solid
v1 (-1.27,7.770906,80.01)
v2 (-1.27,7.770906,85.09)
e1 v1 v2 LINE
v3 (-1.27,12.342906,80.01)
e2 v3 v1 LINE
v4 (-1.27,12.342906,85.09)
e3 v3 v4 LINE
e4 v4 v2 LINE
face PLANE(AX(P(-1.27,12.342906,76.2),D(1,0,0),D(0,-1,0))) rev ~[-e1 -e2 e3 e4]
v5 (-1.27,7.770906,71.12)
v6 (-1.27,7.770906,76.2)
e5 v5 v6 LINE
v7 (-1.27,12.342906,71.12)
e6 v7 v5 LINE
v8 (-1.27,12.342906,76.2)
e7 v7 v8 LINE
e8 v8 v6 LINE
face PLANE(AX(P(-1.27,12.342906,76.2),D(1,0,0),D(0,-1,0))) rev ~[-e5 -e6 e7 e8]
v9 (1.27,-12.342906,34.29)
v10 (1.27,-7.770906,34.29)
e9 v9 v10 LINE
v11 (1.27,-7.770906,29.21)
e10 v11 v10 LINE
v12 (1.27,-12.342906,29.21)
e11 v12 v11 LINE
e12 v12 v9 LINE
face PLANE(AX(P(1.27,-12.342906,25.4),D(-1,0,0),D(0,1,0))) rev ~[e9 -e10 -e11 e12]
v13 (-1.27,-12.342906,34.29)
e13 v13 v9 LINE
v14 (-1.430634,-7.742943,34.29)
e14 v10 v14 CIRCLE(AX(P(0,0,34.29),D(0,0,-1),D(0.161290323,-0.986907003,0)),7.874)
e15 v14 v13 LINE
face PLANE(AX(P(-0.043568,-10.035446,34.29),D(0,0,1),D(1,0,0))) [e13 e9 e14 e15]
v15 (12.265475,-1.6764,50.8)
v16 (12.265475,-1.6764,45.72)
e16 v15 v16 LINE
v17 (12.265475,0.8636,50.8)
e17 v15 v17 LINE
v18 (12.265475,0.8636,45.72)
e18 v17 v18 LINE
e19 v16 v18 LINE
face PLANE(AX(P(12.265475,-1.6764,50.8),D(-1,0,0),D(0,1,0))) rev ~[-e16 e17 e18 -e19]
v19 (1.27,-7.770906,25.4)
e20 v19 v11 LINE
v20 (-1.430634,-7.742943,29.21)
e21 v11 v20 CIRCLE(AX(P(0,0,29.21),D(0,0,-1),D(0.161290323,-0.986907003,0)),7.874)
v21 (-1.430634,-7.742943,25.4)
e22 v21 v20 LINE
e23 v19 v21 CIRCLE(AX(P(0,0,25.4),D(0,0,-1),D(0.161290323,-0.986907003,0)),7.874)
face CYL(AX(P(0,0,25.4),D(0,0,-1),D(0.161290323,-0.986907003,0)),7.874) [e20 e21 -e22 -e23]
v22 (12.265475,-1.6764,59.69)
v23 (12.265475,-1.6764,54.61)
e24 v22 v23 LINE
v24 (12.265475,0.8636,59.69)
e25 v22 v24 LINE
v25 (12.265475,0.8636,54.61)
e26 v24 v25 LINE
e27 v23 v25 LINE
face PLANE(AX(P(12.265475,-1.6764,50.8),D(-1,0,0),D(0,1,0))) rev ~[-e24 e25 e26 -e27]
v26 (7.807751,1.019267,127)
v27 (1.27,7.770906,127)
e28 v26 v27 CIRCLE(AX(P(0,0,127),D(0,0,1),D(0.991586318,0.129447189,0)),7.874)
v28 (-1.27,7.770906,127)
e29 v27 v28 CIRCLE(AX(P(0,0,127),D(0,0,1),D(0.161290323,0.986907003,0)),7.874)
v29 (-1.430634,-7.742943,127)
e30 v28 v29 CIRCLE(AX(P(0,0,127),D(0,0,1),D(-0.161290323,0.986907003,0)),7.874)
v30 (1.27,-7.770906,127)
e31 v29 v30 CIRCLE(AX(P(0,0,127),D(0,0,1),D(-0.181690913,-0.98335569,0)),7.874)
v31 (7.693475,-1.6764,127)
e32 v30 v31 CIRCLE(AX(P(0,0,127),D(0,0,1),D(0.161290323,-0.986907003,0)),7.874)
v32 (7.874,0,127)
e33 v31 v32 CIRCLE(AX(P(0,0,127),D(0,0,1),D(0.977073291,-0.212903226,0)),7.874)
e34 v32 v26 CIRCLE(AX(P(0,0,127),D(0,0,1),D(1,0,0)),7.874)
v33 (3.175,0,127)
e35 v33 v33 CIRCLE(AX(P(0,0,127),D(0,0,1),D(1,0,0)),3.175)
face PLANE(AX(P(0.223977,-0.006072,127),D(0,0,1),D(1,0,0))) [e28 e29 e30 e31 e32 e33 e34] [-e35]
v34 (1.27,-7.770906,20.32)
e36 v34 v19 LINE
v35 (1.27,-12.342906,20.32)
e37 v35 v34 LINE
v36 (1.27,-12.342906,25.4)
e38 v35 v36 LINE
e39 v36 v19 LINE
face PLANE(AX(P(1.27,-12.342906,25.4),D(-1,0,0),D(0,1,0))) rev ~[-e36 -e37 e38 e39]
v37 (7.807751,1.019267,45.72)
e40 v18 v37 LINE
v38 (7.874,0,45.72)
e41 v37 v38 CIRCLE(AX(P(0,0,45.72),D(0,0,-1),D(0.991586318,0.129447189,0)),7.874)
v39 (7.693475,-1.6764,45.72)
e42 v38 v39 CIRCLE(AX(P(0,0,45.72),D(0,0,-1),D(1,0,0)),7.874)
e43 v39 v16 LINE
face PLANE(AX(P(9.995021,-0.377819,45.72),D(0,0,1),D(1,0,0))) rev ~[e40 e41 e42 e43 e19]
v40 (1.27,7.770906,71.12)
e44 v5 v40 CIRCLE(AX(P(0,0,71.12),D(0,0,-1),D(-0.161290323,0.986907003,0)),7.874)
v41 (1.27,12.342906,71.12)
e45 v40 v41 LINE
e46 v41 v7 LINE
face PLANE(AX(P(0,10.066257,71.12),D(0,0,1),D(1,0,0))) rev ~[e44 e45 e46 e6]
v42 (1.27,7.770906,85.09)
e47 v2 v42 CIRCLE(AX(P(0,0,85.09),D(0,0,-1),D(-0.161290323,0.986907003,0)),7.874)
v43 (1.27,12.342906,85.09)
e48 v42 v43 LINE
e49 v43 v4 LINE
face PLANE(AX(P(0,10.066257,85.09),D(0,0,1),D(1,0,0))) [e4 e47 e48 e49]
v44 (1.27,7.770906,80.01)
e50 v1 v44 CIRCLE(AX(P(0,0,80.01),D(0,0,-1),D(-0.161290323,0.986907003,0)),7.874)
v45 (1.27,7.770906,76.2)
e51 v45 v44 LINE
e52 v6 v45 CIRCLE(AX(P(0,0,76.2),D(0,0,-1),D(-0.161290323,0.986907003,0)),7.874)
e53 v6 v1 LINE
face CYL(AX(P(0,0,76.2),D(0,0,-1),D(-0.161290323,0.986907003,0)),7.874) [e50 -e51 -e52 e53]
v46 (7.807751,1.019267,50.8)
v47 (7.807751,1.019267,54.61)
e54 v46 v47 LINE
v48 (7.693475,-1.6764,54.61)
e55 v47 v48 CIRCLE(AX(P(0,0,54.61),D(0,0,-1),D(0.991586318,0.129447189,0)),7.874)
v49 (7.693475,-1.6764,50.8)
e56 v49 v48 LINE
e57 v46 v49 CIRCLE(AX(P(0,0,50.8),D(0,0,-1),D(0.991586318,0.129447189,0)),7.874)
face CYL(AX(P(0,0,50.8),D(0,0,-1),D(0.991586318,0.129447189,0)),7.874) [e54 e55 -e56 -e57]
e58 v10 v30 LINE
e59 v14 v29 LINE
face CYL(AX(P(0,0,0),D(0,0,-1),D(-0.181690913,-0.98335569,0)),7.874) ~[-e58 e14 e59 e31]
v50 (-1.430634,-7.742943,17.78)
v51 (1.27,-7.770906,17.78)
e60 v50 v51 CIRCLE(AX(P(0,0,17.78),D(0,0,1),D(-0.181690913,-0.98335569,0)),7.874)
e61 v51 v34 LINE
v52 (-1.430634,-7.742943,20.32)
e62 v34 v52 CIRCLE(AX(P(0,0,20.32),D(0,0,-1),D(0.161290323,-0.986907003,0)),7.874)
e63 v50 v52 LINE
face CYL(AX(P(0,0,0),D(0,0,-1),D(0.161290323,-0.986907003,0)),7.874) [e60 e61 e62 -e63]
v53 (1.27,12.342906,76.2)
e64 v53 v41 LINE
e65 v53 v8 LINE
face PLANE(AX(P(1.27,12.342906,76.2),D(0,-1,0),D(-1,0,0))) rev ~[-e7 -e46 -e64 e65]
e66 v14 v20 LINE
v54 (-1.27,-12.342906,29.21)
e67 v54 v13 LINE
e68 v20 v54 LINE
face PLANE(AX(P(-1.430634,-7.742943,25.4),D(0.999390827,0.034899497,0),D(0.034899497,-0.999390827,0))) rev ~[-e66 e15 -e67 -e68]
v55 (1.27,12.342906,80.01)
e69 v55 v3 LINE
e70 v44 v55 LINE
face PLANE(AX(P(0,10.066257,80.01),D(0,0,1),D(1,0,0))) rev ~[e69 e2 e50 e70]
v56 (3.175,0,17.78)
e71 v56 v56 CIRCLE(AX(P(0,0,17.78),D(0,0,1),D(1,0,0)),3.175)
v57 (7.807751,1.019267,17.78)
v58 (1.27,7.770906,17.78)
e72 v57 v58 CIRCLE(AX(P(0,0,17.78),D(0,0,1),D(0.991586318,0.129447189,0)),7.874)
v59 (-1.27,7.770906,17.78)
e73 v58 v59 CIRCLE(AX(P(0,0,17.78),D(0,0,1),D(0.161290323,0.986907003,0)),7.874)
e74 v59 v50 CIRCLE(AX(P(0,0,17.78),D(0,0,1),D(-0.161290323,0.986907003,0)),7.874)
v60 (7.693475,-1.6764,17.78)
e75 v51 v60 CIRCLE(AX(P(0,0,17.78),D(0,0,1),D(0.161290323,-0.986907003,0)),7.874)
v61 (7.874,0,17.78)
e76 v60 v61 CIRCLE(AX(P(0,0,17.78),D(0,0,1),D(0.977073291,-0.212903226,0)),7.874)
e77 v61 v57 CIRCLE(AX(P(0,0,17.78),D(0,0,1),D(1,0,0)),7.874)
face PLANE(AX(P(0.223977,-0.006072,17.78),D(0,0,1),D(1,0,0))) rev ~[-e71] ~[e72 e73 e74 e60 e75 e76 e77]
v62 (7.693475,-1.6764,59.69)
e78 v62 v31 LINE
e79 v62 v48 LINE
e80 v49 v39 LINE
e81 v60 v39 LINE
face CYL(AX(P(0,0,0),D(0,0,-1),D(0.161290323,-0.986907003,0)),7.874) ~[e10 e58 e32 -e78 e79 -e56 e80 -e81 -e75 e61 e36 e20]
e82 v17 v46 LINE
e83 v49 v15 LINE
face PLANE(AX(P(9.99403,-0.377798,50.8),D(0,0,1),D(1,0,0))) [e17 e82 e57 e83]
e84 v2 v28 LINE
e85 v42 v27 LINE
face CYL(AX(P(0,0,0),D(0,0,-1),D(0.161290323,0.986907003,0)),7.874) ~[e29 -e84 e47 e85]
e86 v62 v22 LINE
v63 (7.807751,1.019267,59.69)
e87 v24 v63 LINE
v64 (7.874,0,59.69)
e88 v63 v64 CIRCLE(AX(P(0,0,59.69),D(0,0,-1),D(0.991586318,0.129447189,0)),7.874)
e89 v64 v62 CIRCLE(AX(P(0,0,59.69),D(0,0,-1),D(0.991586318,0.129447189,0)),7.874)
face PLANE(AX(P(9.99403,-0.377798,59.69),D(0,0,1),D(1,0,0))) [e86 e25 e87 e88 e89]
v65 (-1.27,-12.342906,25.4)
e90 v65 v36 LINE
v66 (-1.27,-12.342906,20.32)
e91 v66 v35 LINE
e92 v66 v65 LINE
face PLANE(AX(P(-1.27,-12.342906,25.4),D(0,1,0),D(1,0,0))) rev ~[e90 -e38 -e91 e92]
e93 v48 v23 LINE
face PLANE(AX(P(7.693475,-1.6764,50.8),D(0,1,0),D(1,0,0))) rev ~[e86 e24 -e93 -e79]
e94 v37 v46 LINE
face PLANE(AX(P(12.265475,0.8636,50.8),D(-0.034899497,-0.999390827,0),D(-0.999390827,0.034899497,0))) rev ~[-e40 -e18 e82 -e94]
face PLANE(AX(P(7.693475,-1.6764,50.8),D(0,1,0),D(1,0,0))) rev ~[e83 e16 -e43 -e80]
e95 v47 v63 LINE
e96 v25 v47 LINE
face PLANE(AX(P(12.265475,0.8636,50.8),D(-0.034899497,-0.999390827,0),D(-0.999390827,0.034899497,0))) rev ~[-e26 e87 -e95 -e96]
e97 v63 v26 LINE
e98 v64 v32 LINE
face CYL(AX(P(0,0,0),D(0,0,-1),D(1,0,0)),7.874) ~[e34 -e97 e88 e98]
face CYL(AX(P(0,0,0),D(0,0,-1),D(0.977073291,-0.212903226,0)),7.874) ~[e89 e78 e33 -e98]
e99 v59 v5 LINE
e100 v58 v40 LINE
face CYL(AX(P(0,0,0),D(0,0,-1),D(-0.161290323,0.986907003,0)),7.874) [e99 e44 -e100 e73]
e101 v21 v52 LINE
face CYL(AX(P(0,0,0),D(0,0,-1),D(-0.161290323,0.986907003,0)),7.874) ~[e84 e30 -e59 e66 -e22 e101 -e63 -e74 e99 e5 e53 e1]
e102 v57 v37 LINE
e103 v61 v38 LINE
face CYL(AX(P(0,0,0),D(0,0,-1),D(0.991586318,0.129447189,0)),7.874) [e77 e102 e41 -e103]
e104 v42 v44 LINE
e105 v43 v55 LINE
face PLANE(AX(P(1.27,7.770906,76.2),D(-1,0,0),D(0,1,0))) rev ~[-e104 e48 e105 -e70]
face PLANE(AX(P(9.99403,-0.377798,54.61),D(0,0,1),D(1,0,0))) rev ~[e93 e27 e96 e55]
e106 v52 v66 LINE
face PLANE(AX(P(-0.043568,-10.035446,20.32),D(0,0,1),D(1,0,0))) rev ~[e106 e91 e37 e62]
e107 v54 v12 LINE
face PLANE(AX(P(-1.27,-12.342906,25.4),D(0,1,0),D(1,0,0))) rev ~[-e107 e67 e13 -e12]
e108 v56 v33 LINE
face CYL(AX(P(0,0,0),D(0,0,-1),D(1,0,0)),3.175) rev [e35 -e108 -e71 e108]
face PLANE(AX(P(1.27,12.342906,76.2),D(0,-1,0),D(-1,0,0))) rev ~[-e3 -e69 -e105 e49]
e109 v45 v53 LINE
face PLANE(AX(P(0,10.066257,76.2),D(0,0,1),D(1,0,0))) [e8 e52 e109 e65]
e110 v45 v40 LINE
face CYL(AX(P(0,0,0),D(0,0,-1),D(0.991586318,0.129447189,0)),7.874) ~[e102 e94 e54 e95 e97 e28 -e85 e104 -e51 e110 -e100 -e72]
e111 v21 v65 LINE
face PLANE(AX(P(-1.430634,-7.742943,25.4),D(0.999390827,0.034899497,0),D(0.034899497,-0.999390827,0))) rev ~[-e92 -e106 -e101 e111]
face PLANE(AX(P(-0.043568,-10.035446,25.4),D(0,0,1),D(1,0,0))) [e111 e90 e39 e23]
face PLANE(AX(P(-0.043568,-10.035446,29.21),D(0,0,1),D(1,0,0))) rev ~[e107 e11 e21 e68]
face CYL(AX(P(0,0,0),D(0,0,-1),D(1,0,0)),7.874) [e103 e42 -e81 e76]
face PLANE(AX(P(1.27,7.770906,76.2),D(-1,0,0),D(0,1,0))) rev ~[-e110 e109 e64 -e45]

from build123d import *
from build123d import SkipClean  # not in build123d's __all__

# Parameters (mm, degrees)
F0_R      = 3.175
F1_DEPTH  = 127
F2_DEPTH  = 76.2
F3_DEPTH  = 71.12
F4_DEPTH  = 50.8
F5_DEPTH  = 45.72
F6_DEPTH  = 25.4
F7_DEPTH  = 20.32
F9_DEPTH  = 8.89
F10_DEPTH = 3.81
F12_DEPTH = 8.89
F13_DEPTH = 3.81
F15_DEPTH = 8.89
F16_DEPTH = 3.81
F17_DEPTH = 17.78


# Not quite as in the source:
# - after a boolean that leaves OpenCascade's solid faulty, fix() repairs it


with BuildPart() as f1:
    # F0 (on Top) → F1 (new body)
    with BuildSketch(Plane.XY):
        with BuildLine():
            ThreePointArc((7.6934750952, -1.6764), (7.8287386883, -0.8430459954), (7.874, 0))
            ThreePointArc((7.874, 0), (7.8574202107, 0.5107089515), (7.8077506647, 1.0192671673))
            ThreePointArc((7.8077506647, 1.0192671673), (5.6566372636, 5.4774383491), (1.27, 7.7709057387))
            ThreePointArc((1.27, 7.7709057387), (0, 7.874), (-1.27, 7.7709057387))
            ThreePointArc((-1.27, 7.7709057387), (-7.8735779463, 0.0815249862), (-1.430634249, -7.7429426994))
            ThreePointArc((-1.430634249, -7.7429426994), (-0.0815249862, -7.8735779463), (1.27, -7.7709057387))
            ThreePointArc((1.27, -7.7709057387), (5.4195683864, -5.7121059606), (7.6934750952, -1.6764))
        make_face()
        Circle(F0_R, mode=Mode.SUBTRACT)
    extrude(amount=F1_DEPTH)

    # F0 (on Top) → F2 (join)
    with BuildSketch(Plane.XY):
        with BuildLine():
            ThreePointArc((-1.27, 7.7709057387), (0, 7.874), (1.27, 7.7709057387))
            Line((1.27, 7.7709057387), (1.27, 12.3429057387))
            Line((1.27, 12.3429057387), (-1.27, 12.3429057387))
            Line((-1.27, 12.3429057387), (-1.27, 7.7709057387))
        make_face()
    extrude(amount=F2_DEPTH)

    # F0 (on Top) → F3 (cut)
    with BuildSketch(Plane.XY):
        with BuildLine():
            ThreePointArc((-1.27, 7.7709057387), (0, 7.874), (1.27, 7.7709057387))
            Line((1.27, 7.7709057387), (1.27, 12.3429057387))
            Line((1.27, 12.3429057387), (-1.27, 12.3429057387))
            Line((-1.27, 12.3429057387), (-1.27, 7.7709057387))
        make_face()
    with SkipClean():  # cleaning this boolean's faces spoils the solid; the shape is the same uncleaned
        extrude(amount=F3_DEPTH, mode=Mode.SUBTRACT)

    # F0 (on Top) → F4 (join)
    with BuildSketch(Plane.XY):
        with BuildLine():
            ThreePointArc((7.8077506647, 1.0192671673), (7.8574202107, 0.5107089515), (7.874, 0))
            ThreePointArc((7.874, 0), (7.8287386883, -0.8430459954), (7.6934750952, -1.6764))
            Line((7.6934750952, -1.6764), (12.2654750952, -1.6764))
            Line((12.2654750952, -1.6764), (12.2654750952, 0.8636))
            Line((12.2654750952, 0.8636), (7.8077506647, 1.0192671673))
        make_face()
    extrude(amount=F4_DEPTH)

    add(f1.part.fix(), mode=Mode.REPLACE)

    # F0 (on Top) → F5 (cut)
    with BuildSketch(Plane.XY):
        with BuildLine():
            ThreePointArc((7.8077506647, 1.0192671673), (7.8574202107, 0.5107089515), (7.874, 0))
            ThreePointArc((7.874, 0), (7.8287386883, -0.8430459954), (7.6934750952, -1.6764))
            Line((7.6934750952, -1.6764), (12.2654750952, -1.6764))
            Line((12.2654750952, -1.6764), (12.2654750952, 0.8636))
            Line((12.2654750952, 0.8636), (7.8077506647, 1.0192671673))
        make_face()
    with SkipClean():  # cleaning this boolean's faces spoils the solid; the shape is the same uncleaned
        extrude(amount=F5_DEPTH, mode=Mode.SUBTRACT)

    # F0 (on Top) → F6 (join)
    with BuildSketch(Plane.XY):
        with BuildLine():
            Line((1.27, -12.3429057387), (1.27, -7.7709057387))
            ThreePointArc((1.27, -7.7709057387), (-0.0815249862, -7.8735779463), (-1.430634249, -7.7429426994))
            Line((-1.430634249, -7.7429426994), (-1.27, -12.3429057387))
            Line((-1.27, -12.3429057387), (1.27, -12.3429057387))
        make_face()
    extrude(amount=F6_DEPTH)

    add(f1.part.fix(), mode=Mode.REPLACE)

    # F0 (on Top) → F7 (cut)
    with BuildSketch(Plane.XY):
        with BuildLine():
            Line((1.27, -12.3429057387), (1.27, -7.7709057387))
            ThreePointArc((1.27, -7.7709057387), (-0.0815249862, -7.8735779463), (-1.430634249, -7.7429426994))
            Line((-1.430634249, -7.7429426994), (-1.27, -12.3429057387))
            Line((-1.27, -12.3429057387), (1.27, -12.3429057387))
        make_face()
    with SkipClean():  # cleaning this boolean's faces spoils the solid; the shape is the same uncleaned
        extrude(amount=F7_DEPTH, mode=Mode.SUBTRACT)

    # F8 (on face) → F9 (join)
    with BuildSketch(Plane.XY.offset(76.2)):
        with BuildLine():
            Line((1.27, 12.3429057387), (-1.27, 12.3429057387))
            Line((-1.27, 12.3429057387), (-1.27, 7.7709057387))
            ThreePointArc((-1.27, 7.7709057387), (0, 7.874), (1.27, 7.7709057387))
            Line((1.27, 7.7709057387), (1.27, 12.3429057387))
        make_face()
    extrude(amount=F9_DEPTH)

    # F8 (on face) → F10 (cut)
    with BuildSketch(Plane.XY.offset(76.2)):
        with BuildLine():
            Line((1.27, 12.3429057387), (-1.27, 12.3429057387))
            Line((-1.27, 12.3429057387), (-1.27, 7.7709057387))
            ThreePointArc((-1.27, 7.7709057387), (0, 7.874), (1.27, 7.7709057387))
            Line((1.27, 7.7709057387), (1.27, 12.3429057387))
        make_face()
    with SkipClean():  # cleaning this boolean's faces spoils the solid; the shape is the same uncleaned
        extrude(amount=F10_DEPTH, mode=Mode.SUBTRACT)

    # F11 (on face) → F12 (join)
    with BuildSketch(Plane.XY.offset(50.8)):
        with BuildLine():
            Line((12.2654750952, 0.8636), (7.8077506647, 1.0192671673))
            ThreePointArc((7.8077506647, 1.0192671673), (7.8669343066, -0.3334975508), (7.6934750952, -1.6764))
            Line((7.6934750952, -1.6764), (12.2654750952, -1.6764))
            Line((12.2654750952, -1.6764), (12.2654750952, 0.8636))
        make_face()
    extrude(amount=F12_DEPTH)

    # F11 (on face) → F13 (cut)
    with BuildSketch(Plane.XY.offset(50.8)):
        with BuildLine():
            Line((12.2654750952, 0.8636), (7.8077506647, 1.0192671673))
            ThreePointArc((7.8077506647, 1.0192671673), (7.8669343066, -0.3334975508), (7.6934750952, -1.6764))
            Line((7.6934750952, -1.6764), (12.2654750952, -1.6764))
            Line((12.2654750952, -1.6764), (12.2654750952, 0.8636))
        make_face()
    with SkipClean():  # cleaning this boolean's faces spoils the solid; the shape is the same uncleaned
        extrude(amount=F13_DEPTH, mode=Mode.SUBTRACT)

    # F14 (on face) → F15 (join)
    with BuildSketch(Plane.XY.offset(25.4)):
        with BuildLine():
            ThreePointArc((1.27, -7.7709057387), (-0.0815249862, -7.8735779463), (-1.430634249, -7.7429426994))
            Line((-1.430634249, -7.7429426994), (-1.27, -12.3429057387))
            Line((-1.27, -12.3429057387), (1.27, -12.3429057387))
            Line((1.27, -12.3429057387), (1.27, -7.7709057387))
        make_face()
    extrude(amount=F15_DEPTH)

    # F14 (on face) → F16 (cut)
    with BuildSketch(Plane.XY.offset(25.4)):
        with BuildLine():
            ThreePointArc((1.27, -7.7709057387), (-0.0815249862, -7.8735779463), (-1.430634249, -7.7429426994))
            Line((-1.430634249, -7.7429426994), (-1.27, -12.3429057387))
            Line((-1.27, -12.3429057387), (1.27, -12.3429057387))
            Line((1.27, -12.3429057387), (1.27, -7.7709057387))
        make_face()
    extrude(amount=F16_DEPTH, mode=Mode.SUBTRACT)

    # F0 (on Top) → F17 (cut)
    with BuildSketch(Plane.XY):
        with BuildLine():
            ThreePointArc((7.6934750952, -1.6764), (7.8287386883, -0.8430459954), (7.874, 0))
            ThreePointArc((7.874, 0), (7.8574202107, 0.5107089515), (7.8077506647, 1.0192671673))
            ThreePointArc((7.8077506647, 1.0192671673), (5.6566372636, 5.4774383491), (1.27, 7.7709057387))
            ThreePointArc((1.27, 7.7709057387), (0, 7.874), (-1.27, 7.7709057387))
            ThreePointArc((-1.27, 7.7709057387), (-7.8735779463, 0.0815249862), (-1.430634249, -7.7429426994))
            ThreePointArc((-1.430634249, -7.7429426994), (-0.0815249862, -7.8735779463), (1.27, -7.7709057387))
            ThreePointArc((1.27, -7.7709057387), (5.4195683864, -5.7121059606), (7.6934750952, -1.6764))
        make_face()
        Circle(F0_R, mode=Mode.SUBTRACT)
    extrude(amount=F17_DEPTH, mode=Mode.SUBTRACT)


solid = f1.part
